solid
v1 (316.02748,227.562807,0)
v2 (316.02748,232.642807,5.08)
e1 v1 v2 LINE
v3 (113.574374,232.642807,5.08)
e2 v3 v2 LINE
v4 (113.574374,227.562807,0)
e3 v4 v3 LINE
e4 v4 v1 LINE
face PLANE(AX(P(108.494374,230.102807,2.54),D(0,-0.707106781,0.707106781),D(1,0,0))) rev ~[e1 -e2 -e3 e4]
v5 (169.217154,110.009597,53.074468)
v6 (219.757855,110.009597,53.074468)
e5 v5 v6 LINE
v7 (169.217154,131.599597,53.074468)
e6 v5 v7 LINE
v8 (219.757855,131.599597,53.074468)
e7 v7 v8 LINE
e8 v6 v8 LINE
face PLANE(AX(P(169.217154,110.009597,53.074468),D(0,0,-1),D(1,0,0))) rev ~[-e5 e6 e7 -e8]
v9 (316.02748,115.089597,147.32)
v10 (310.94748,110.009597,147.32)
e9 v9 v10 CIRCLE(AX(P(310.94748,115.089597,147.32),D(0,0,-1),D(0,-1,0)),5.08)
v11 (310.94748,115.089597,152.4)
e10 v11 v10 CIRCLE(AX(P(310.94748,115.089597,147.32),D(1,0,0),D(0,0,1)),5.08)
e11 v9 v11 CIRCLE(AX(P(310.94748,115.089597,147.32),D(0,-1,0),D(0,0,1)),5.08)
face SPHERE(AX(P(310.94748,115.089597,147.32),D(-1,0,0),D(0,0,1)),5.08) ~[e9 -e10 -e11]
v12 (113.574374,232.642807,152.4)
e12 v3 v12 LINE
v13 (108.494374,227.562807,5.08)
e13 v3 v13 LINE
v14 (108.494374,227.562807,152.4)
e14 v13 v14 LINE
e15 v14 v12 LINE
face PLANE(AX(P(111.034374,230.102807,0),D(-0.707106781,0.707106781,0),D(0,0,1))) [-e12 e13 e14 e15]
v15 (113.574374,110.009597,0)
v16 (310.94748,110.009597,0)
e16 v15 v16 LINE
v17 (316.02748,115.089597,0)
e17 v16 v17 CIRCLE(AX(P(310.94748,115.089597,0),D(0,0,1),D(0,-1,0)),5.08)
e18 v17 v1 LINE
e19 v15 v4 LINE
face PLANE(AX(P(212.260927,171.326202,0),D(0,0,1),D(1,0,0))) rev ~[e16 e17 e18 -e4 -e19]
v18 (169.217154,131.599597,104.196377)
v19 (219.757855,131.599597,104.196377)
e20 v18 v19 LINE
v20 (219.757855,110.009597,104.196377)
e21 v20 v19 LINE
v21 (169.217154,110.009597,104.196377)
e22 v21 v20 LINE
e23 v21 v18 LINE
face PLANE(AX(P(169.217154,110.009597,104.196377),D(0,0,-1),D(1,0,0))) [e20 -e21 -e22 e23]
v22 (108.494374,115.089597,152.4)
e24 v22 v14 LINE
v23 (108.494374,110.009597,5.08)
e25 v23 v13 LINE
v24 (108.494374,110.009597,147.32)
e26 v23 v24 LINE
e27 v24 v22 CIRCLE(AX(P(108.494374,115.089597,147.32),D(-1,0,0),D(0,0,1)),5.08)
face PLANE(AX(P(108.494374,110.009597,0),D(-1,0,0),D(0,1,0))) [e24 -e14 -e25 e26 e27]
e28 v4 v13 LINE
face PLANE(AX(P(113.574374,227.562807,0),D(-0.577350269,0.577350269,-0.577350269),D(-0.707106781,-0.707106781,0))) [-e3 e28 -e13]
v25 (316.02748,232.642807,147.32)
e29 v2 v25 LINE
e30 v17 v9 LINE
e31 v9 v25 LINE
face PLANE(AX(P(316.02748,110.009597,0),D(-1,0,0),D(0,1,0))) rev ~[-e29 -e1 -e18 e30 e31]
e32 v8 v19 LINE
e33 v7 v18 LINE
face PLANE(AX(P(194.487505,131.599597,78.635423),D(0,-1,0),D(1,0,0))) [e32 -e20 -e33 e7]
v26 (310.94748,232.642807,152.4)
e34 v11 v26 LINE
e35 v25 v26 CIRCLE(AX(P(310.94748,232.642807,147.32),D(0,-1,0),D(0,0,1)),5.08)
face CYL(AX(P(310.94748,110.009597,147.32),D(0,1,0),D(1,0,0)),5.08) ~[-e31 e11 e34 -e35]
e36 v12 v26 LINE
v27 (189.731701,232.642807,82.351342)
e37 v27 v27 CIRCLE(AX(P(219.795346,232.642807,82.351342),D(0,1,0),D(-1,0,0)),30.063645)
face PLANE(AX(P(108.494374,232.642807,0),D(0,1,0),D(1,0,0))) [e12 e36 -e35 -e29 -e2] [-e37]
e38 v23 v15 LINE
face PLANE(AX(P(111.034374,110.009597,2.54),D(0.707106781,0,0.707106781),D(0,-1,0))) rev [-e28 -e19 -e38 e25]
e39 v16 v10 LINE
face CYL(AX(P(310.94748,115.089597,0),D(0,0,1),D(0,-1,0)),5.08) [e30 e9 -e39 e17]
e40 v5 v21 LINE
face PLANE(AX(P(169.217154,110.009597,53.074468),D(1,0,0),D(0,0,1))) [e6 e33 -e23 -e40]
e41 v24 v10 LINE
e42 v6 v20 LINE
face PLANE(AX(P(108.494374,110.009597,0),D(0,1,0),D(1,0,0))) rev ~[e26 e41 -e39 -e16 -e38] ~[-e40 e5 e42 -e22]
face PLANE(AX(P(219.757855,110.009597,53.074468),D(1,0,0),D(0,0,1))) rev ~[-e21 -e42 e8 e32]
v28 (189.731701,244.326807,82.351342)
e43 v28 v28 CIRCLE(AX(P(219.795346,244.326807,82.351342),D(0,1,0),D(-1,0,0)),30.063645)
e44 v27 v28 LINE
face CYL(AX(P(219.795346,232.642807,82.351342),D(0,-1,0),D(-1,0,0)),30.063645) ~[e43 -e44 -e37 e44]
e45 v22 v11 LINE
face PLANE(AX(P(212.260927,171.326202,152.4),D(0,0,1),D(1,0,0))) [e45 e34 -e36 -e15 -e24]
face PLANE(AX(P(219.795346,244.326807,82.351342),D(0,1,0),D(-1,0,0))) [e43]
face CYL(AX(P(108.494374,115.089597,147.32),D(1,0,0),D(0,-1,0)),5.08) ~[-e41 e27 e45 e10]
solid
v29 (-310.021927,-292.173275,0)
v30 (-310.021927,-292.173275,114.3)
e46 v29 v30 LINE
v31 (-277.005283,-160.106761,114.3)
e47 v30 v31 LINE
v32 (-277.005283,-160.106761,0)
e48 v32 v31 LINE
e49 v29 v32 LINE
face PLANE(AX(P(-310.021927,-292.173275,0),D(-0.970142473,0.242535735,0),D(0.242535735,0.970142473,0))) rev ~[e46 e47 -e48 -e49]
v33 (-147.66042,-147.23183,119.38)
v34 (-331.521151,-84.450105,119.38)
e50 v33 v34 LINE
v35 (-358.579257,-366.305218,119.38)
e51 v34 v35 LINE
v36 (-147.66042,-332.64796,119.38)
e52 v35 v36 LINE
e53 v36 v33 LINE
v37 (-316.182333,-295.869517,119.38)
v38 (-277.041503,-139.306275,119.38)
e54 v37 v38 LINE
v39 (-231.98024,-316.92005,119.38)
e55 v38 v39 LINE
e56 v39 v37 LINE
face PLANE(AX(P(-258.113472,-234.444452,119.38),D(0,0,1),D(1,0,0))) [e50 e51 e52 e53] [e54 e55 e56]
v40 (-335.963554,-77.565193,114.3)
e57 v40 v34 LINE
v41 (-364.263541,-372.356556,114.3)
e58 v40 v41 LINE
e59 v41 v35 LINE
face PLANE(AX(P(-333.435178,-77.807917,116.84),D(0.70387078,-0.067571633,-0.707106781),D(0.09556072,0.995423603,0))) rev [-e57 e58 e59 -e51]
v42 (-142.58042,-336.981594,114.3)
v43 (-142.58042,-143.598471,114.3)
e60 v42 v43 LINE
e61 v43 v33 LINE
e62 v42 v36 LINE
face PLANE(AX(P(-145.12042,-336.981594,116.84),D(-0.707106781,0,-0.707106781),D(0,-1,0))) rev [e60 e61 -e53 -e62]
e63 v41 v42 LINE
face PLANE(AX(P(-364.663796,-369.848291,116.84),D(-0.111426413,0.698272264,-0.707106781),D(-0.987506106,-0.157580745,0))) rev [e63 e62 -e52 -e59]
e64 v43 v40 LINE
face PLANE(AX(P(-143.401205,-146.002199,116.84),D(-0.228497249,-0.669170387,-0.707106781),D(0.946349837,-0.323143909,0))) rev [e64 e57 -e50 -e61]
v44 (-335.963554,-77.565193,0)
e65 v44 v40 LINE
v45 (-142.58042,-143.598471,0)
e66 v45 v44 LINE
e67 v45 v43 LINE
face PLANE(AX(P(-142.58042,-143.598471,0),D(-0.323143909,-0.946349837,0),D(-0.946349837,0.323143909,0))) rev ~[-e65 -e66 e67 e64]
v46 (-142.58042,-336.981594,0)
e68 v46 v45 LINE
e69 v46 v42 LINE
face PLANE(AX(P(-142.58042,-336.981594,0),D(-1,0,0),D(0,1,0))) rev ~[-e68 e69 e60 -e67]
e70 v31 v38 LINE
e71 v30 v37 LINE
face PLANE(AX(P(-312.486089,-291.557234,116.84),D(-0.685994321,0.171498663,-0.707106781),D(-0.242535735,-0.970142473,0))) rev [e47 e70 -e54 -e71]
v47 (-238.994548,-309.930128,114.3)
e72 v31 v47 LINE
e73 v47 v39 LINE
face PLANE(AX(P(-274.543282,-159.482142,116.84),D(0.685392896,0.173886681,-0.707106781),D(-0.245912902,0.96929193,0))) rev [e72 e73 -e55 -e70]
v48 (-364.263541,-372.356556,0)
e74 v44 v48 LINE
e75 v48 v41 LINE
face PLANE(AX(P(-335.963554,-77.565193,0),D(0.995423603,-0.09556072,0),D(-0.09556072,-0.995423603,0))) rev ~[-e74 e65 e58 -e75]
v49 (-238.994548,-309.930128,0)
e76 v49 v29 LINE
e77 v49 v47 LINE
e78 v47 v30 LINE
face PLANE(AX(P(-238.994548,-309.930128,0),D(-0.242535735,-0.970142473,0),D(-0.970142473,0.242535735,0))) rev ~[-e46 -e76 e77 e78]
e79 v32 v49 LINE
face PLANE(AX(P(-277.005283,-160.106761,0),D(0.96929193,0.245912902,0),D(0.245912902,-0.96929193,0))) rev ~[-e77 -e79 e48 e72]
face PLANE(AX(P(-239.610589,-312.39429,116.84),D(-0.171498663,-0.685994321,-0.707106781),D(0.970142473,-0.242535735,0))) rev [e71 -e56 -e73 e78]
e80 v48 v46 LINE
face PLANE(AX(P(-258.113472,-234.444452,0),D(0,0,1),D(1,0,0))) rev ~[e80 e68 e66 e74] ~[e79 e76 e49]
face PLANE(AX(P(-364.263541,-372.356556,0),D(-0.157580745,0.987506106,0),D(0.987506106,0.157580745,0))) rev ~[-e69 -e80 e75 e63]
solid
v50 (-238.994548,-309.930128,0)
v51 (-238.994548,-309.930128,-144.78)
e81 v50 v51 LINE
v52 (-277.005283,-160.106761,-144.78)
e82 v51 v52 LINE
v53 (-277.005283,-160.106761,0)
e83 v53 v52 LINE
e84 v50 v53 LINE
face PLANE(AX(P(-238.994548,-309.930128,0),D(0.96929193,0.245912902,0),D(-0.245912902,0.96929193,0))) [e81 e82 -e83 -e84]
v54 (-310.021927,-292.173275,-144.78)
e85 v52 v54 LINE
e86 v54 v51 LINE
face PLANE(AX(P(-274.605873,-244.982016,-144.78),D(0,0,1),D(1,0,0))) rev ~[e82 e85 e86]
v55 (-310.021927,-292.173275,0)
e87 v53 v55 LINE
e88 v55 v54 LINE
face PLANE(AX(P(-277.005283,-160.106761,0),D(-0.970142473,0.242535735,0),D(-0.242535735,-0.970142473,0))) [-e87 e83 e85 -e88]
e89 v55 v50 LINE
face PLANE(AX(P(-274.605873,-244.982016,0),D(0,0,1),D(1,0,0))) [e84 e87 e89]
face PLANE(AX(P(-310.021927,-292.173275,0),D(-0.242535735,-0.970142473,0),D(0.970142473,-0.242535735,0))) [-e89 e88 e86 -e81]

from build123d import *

# Parameters (mm, degrees)
F0_W      = 207.5331061672
F0_H      = 122.6332091976
F1_DEPTH  = 152.4
F3_DEPTH  = 144.78
F4_DEPTH  = 119.38
F5_R      = 5.08
F6_SIZE   = 5.08
F7_SIZE   = 5.08
F8_R      = 30.0636447878
F9_DEPTH  = 11.684
F10_W     = 50.5407005548
F10_H     = 51.1219091713
F11_DEPTH = 21.59


# Not quite as in the source:
# - the program builds the solid bodies; features that only make, move or delete a surface that nothing else refers to are left out


with BuildPart() as f1:
    # F0 (on Top) → F1 (new body)
    with BuildSketch(Plane.XY):
        with Locations((212.2609269613, 171.3262020208)):
            Rectangle(F0_W, F0_H)
    extrude(amount=F1_DEPTH)

    # F5
    f5_edges = [f1.edges().sort_by_distance(p)[0] for p in [
        (212.260927, 110.009597, 152.4),
        (316.02748, 171.326202, 152.4),
        (316.02748, 110.009597, 76.2),
    ]]
    fillet(f5_edges, radius=F5_R)

    # F6
    f6_edges = [f1.edges().sort_by_distance(p)[0] for p in [
        (108.494374, 232.642807, 76.2),
        (212.260927, 232.642807, 0),
        (108.494374, 171.326202, 0),
    ]]
    chamfer(f6_edges, length=F6_SIZE)

    # F8 (on face) → F9 (join)
    with BuildSketch(Plane(origin=(0, 232.6428066196, 0), x_dir=(-1, 0, 0), z_dir=(0, 1, 0))):
        with Locations((-219.7953462601, 82.3513418436)):
            Circle(F8_R)
    extrude(amount=F9_DEPTH)

    # F10 (on face) → F11 (cut)
    with BuildSketch(Plane.XZ.offset(-110.009597422)):
        with Locations((194.4875046611, 78.6354225129)):
            Rectangle(F10_W, F10_H)
    extrude(amount=-F11_DEPTH, mode=Mode.SUBTRACT)


with BuildPart() as f3:
    # F0 (on Top) → F3 (new body)
    with BuildSketch(Plane.XY):
        Polygon((-238.994547933, -309.9301279931), (-277.0052831988, -160.1067611335), (-310.0219274309, -292.1732745837), align=None)
    extrude(amount=-F3_DEPTH)


with BuildPart() as f4:
    # F0 (on Top) → F4 (new body)
    with BuildSketch(Plane.XY):
        Polygon((-142.5804198811, -143.5984707565), (-335.9635537997, -77.565192872), (-364.2635406156, -372.3565564559), (-142.5804198811, -336.9815940954), align=None)
        Polygon((-310.0219274309, -292.1732745837), (-277.0052831988, -160.1067611335), (-238.994547933, -309.9301279931), align=None, mode=Mode.SUBTRACT)
    extrude(amount=F4_DEPTH)

    # F7
    f7_edges = [f4.edges().sort_by_distance(p)[0] for p in [
        (-350.113547, -224.960875, 119.38),
        (-253.42198, -354.669075, 119.38),
        (-142.58042, -240.290032, 119.38),
        (-239.271987, -110.581832, 119.38),
        (-274.508238, -301.051701, 119.38),
        (-293.513605, -226.140018, 119.38),
        (-257.999916, -235.018445, 119.38),
    ]]
    chamfer(f7_edges, length=F7_SIZE)


solid = Compound([f1.part, f3.part, f4.part])
